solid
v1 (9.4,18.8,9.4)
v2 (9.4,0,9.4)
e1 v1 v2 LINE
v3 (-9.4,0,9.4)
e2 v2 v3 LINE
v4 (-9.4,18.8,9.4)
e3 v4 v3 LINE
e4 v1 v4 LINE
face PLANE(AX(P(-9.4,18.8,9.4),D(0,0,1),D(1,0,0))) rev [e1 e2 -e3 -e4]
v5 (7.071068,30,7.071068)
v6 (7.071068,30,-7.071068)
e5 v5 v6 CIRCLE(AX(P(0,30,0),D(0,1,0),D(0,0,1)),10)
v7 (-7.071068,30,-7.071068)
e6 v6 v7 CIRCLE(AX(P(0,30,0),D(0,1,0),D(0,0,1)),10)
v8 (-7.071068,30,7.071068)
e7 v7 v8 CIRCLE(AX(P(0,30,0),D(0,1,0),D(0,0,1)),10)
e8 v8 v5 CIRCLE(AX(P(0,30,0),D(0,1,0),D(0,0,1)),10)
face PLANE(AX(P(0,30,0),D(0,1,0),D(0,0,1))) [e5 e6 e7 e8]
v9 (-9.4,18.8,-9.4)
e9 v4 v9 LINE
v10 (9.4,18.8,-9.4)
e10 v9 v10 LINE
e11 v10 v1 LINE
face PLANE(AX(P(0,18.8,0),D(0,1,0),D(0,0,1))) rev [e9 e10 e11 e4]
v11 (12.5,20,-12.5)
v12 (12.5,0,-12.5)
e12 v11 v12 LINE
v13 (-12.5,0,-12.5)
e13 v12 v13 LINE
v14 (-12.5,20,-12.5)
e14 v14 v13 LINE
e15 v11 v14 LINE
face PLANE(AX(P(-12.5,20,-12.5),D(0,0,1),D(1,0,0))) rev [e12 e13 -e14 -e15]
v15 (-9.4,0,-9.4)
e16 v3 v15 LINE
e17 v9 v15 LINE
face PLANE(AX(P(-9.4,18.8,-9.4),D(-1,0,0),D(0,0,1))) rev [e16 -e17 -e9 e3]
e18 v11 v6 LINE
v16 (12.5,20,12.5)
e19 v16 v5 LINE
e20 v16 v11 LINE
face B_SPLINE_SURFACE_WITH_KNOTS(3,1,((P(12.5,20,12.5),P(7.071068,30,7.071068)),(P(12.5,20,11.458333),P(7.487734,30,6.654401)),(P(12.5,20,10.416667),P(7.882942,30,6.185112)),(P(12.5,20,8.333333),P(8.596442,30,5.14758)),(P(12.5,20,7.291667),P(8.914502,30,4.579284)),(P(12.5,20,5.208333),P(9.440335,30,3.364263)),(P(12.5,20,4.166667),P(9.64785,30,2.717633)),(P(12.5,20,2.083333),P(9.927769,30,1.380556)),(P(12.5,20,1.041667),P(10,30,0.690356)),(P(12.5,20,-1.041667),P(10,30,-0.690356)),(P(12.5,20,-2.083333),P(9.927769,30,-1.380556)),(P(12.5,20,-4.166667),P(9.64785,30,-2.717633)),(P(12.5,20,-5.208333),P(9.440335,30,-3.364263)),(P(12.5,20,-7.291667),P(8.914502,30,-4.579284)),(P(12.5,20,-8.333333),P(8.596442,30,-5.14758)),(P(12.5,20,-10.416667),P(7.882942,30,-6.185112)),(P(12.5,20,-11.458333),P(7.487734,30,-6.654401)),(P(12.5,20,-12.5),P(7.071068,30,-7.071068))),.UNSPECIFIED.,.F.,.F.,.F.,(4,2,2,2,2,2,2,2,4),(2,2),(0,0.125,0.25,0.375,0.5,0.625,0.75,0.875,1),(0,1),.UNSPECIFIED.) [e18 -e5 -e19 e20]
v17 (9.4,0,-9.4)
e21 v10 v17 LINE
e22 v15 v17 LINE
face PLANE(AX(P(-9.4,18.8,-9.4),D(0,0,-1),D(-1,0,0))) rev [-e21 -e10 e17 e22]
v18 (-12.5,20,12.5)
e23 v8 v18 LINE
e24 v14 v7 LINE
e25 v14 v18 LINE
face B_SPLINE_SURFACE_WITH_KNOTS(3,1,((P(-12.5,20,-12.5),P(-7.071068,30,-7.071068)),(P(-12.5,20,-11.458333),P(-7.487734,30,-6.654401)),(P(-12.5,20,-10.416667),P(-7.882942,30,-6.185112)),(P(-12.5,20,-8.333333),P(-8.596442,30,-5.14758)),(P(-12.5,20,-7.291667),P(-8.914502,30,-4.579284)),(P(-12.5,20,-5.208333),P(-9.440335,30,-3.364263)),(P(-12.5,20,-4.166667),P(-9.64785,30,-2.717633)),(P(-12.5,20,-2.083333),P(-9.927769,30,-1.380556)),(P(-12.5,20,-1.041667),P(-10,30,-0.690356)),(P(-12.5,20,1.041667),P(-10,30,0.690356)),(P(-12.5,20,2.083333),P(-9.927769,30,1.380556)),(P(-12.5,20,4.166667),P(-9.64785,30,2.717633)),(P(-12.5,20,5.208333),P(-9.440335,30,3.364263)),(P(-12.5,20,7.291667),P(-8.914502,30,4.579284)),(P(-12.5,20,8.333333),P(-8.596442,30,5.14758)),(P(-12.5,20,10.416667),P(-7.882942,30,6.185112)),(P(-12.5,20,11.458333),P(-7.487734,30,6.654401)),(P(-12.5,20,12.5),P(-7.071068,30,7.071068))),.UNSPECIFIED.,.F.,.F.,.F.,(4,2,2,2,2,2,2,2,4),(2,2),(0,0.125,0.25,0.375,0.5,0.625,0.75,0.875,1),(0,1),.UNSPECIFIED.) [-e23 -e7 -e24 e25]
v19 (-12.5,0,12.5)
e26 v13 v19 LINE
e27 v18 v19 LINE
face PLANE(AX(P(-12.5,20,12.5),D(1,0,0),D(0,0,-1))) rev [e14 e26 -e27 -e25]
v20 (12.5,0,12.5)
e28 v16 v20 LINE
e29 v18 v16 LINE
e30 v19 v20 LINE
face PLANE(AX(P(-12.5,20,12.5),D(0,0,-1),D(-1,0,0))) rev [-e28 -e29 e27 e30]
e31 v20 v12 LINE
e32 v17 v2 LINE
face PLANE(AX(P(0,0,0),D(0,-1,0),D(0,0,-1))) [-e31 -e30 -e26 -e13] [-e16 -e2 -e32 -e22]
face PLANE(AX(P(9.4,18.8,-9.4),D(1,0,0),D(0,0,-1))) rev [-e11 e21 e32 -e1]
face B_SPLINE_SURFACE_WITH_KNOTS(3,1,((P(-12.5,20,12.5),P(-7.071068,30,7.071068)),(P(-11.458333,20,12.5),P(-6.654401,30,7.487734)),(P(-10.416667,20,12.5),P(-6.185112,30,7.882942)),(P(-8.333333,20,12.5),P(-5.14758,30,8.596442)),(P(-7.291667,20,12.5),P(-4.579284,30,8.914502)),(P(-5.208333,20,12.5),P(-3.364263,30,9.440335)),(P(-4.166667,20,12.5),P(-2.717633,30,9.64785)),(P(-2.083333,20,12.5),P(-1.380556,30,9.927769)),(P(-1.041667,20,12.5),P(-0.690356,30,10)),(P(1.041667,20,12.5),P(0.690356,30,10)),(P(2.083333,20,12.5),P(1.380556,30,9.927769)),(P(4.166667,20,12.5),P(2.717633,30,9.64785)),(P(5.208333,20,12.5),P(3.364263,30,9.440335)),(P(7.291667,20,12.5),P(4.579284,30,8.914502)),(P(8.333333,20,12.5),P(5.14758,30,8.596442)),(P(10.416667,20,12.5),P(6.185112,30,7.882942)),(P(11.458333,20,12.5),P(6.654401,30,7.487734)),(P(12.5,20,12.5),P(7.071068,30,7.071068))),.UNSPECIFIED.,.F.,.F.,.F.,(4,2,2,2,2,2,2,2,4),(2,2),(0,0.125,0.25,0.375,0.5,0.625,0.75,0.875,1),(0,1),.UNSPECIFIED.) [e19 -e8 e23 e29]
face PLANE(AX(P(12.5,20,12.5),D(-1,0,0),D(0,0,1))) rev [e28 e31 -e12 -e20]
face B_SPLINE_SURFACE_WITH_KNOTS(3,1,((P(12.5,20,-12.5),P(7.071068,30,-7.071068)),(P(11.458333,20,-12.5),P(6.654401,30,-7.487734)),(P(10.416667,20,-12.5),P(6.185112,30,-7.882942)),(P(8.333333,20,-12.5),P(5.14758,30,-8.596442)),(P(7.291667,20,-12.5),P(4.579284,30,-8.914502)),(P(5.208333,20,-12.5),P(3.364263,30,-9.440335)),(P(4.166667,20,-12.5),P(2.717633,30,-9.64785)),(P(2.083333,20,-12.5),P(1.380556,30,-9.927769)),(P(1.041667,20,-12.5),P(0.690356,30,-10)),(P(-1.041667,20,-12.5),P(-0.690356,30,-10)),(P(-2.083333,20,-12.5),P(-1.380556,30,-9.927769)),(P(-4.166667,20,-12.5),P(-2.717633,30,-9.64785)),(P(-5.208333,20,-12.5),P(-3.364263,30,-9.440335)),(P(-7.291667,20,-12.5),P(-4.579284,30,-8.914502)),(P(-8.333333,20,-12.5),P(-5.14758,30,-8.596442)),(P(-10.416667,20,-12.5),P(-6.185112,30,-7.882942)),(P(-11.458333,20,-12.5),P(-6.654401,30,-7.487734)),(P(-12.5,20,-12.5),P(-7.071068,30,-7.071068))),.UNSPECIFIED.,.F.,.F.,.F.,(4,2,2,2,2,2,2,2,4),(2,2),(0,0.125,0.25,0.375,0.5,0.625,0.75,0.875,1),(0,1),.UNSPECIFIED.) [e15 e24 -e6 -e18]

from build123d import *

# Parameters (mm, degrees)
SKETCH2_W           = 25
SKETCH2_H           = 25
BOSS_EXTRUDE1_DEPTH = 20
SKETCH3_W           = 18.8
SKETCH3_H           = 18.8
CUT_EXTRUDE1_DEPTH  = 18.8


with BuildPart() as part:
    # Sketch2 → Boss-Extrude1 (new body)
    with BuildSketch(Plane(origin=(0, 0, 0), x_dir=(1, 0, 0), z_dir=(0, 1, 0))):
        Rectangle(SKETCH2_W, SKETCH2_H)
    extrude(amount=BOSS_EXTRUDE1_DEPTH)

    # Sketch3 → Cut-Extrude1 (cut)
    with BuildSketch(Plane.XZ):
        Rectangle(SKETCH3_W, SKETCH3_H)
    extrude(amount=-CUT_EXTRUDE1_DEPTH, mode=Mode.SUBTRACT)

    # Loft1: read off the stored shape, not the designer's step
    # Loft1: loft between two sections, ruled curve by curve
    loft1_from = [
        Edge.make_bspline([(-12.5, 20, 12.5), (-11.458333333, 20, 12.5), (-10.416666667, 20, 12.5), (-8.333333333, 20, 12.5), (-7.291666667, 20, 12.5), (-5.208333333, 20, 12.5), (-4.166666667, 20, 12.5), (-2.083333333, 20, 12.5), (-1.041666667, 20, 12.5), (1.041666667, 20, 12.5), (2.083333333, 20, 12.5), (4.166666667, 20, 12.5), (5.208333333, 20, 12.5), (7.291666667, 20, 12.5), (8.333333333, 20, 12.5), (10.416666667, 20, 12.5), (11.458333333, 20, 12.5), (12.5, 20, 12.5)], [0, 0, 0, 0, 0.125, 0.125, 0.25, 0.25, 0.375, 0.375, 0.5, 0.5, 0.625, 0.625, 0.75, 0.75, 0.875, 0.875, 1, 1, 1, 1], 3),
        Edge.make_bspline([(12.5, 20, 12.5), (12.5, 20, 11.458333333), (12.5, 20, 10.416666667), (12.5, 20, 8.333333333), (12.5, 20, 7.291666667), (12.5, 20, 5.208333333), (12.5, 20, 4.166666667), (12.5, 20, 2.083333333), (12.5, 20, 1.041666667), (12.5, 20, -1.041666667), (12.5, 20, -2.083333333), (12.5, 20, -4.166666667), (12.5, 20, -5.208333333), (12.5, 20, -7.291666667), (12.5, 20, -8.333333333), (12.5, 20, -10.416666667), (12.5, 20, -11.458333333), (12.5, 20, -12.5)], [0, 0, 0, 0, 0.125, 0.125, 0.25, 0.25, 0.375, 0.375, 0.5, 0.5, 0.625, 0.625, 0.75, 0.75, 0.875, 0.875, 1, 1, 1, 1], 3),
        Edge.make_bspline([(-12.5, 20, -12.5), (-12.5, 20, -11.458333333), (-12.5, 20, -10.416666667), (-12.5, 20, -8.333333333), (-12.5, 20, -7.291666667), (-12.5, 20, -5.208333333), (-12.5, 20, -4.166666667), (-12.5, 20, -2.083333333), (-12.5, 20, -1.041666667), (-12.5, 20, 1.041666667), (-12.5, 20, 2.083333333), (-12.5, 20, 4.166666667), (-12.5, 20, 5.208333333), (-12.5, 20, 7.291666667), (-12.5, 20, 8.333333333), (-12.5, 20, 10.416666667), (-12.5, 20, 11.458333333), (-12.5, 20, 12.5)], [0, 0, 0, 0, 0.125, 0.125, 0.25, 0.25, 0.375, 0.375, 0.5, 0.5, 0.625, 0.625, 0.75, 0.75, 0.875, 0.875, 1, 1, 1, 1], 3),
        Edge.make_bspline([(12.5, 20, -12.5), (11.458333333, 20, -12.5), (10.416666667, 20, -12.5), (8.333333333, 20, -12.5), (7.291666667, 20, -12.5), (5.208333333, 20, -12.5), (4.166666667, 20, -12.5), (2.083333333, 20, -12.5), (1.041666667, 20, -12.5), (-1.041666667, 20, -12.5), (-2.083333333, 20, -12.5), (-4.166666667, 20, -12.5), (-5.208333333, 20, -12.5), (-7.291666667, 20, -12.5), (-8.333333333, 20, -12.5), (-10.416666667, 20, -12.5), (-11.458333333, 20, -12.5), (-12.5, 20, -12.5)], [0, 0, 0, 0, 0.125, 0.125, 0.25, 0.25, 0.375, 0.375, 0.5, 0.5, 0.625, 0.625, 0.75, 0.75, 0.875, 0.875, 1, 1, 1, 1], 3),
    ]
    loft1_to = [
        Edge.make_bspline([(-7.071067812, 30, 7.071067812), (-6.654401145, 30, 7.487734479), (-6.18511191, 30, 7.882942296), (-5.147579804, 30, 8.596441749), (-4.57928395, 30, 8.914502371), (-3.364263, 30, 9.440335189), (-2.717633031, 30, 9.647849649), (-1.380556459, 30, 9.927768934), (-0.690355937, 30, 10), (0.690355937, 30, 10), (1.380556459, 30, 9.927768934), (2.717633031, 30, 9.647849649), (3.364263, 30, 9.440335189), (4.57928395, 30, 8.914502371), (5.147579804, 30, 8.596441749), (6.18511191, 30, 7.882942296), (6.654401145, 30, 7.487734479), (7.071067812, 30, 7.071067812)], [0, 0, 0, 0, 0.125, 0.125, 0.25, 0.25, 0.375, 0.375, 0.5, 0.5, 0.625, 0.625, 0.75, 0.75, 0.875, 0.875, 1, 1, 1, 1], 3),
        Edge.make_bspline([(7.071067812, 30, 7.071067812), (7.487734479, 30, 6.654401145), (7.882942296, 30, 6.18511191), (8.596441749, 30, 5.147579804), (8.914502371, 30, 4.57928395), (9.440335189, 30, 3.364263), (9.647849649, 30, 2.717633031), (9.927768934, 30, 1.380556459), (10, 30, 0.690355937), (10, 30, -0.690355937), (9.927768934, 30, -1.380556459), (9.647849649, 30, -2.717633031), (9.440335189, 30, -3.364263), (8.914502371, 30, -4.57928395), (8.596441749, 30, -5.147579804), (7.882942296, 30, -6.18511191), (7.487734479, 30, -6.654401145), (7.071067812, 30, -7.071067812)], [0, 0, 0, 0, 0.125, 0.125, 0.25, 0.25, 0.375, 0.375, 0.5, 0.5, 0.625, 0.625, 0.75, 0.75, 0.875, 0.875, 1, 1, 1, 1], 3),
        Edge.make_bspline([(-7.071067812, 30, -7.071067812), (-7.487734479, 30, -6.654401145), (-7.882942296, 30, -6.18511191), (-8.596441749, 30, -5.147579804), (-8.914502371, 30, -4.57928395), (-9.440335189, 30, -3.364263), (-9.647849649, 30, -2.717633031), (-9.927768934, 30, -1.380556459), (-10, 30, -0.690355937), (-10, 30, 0.690355937), (-9.927768934, 30, 1.380556459), (-9.647849649, 30, 2.717633031), (-9.440335189, 30, 3.364263), (-8.914502371, 30, 4.57928395), (-8.596441749, 30, 5.147579804), (-7.882942296, 30, 6.18511191), (-7.487734479, 30, 6.654401145), (-7.071067812, 30, 7.071067812)], [0, 0, 0, 0, 0.125, 0.125, 0.25, 0.25, 0.375, 0.375, 0.5, 0.5, 0.625, 0.625, 0.75, 0.75, 0.875, 0.875, 1, 1, 1, 1], 3),
        Edge.make_bspline([(7.071067812, 30, -7.071067812), (6.654401145, 30, -7.487734479), (6.18511191, 30, -7.882942296), (5.147579804, 30, -8.596441749), (4.57928395, 30, -8.914502371), (3.364263, 30, -9.440335189), (2.717633031, 30, -9.647849649), (1.380556459, 30, -9.927768934), (0.690355937, 30, -10), (-0.690355937, 30, -10), (-1.380556459, 30, -9.927768934), (-2.717633031, 30, -9.647849649), (-3.364263, 30, -9.440335189), (-4.57928395, 30, -8.914502371), (-5.147579804, 30, -8.596441749), (-6.18511191, 30, -7.882942296), (-6.654401145, 30, -7.487734479), (-7.071067812, 30, -7.071067812)], [0, 0, 0, 0, 0.125, 0.125, 0.25, 0.25, 0.375, 0.375, 0.5, 0.5, 0.625, 0.625, 0.75, 0.75, 0.875, 0.875, 1, 1, 1, 1], 3),
    ]
    loft1 = Solid(Shell([*[Face.make_surface_from_curves(loft1_from[k], loft1_to[k]) for k in range(4)], Face(Wire(loft1_from)), Face(Wire(loft1_to))]))
    add(loft1)


solid = part.part
